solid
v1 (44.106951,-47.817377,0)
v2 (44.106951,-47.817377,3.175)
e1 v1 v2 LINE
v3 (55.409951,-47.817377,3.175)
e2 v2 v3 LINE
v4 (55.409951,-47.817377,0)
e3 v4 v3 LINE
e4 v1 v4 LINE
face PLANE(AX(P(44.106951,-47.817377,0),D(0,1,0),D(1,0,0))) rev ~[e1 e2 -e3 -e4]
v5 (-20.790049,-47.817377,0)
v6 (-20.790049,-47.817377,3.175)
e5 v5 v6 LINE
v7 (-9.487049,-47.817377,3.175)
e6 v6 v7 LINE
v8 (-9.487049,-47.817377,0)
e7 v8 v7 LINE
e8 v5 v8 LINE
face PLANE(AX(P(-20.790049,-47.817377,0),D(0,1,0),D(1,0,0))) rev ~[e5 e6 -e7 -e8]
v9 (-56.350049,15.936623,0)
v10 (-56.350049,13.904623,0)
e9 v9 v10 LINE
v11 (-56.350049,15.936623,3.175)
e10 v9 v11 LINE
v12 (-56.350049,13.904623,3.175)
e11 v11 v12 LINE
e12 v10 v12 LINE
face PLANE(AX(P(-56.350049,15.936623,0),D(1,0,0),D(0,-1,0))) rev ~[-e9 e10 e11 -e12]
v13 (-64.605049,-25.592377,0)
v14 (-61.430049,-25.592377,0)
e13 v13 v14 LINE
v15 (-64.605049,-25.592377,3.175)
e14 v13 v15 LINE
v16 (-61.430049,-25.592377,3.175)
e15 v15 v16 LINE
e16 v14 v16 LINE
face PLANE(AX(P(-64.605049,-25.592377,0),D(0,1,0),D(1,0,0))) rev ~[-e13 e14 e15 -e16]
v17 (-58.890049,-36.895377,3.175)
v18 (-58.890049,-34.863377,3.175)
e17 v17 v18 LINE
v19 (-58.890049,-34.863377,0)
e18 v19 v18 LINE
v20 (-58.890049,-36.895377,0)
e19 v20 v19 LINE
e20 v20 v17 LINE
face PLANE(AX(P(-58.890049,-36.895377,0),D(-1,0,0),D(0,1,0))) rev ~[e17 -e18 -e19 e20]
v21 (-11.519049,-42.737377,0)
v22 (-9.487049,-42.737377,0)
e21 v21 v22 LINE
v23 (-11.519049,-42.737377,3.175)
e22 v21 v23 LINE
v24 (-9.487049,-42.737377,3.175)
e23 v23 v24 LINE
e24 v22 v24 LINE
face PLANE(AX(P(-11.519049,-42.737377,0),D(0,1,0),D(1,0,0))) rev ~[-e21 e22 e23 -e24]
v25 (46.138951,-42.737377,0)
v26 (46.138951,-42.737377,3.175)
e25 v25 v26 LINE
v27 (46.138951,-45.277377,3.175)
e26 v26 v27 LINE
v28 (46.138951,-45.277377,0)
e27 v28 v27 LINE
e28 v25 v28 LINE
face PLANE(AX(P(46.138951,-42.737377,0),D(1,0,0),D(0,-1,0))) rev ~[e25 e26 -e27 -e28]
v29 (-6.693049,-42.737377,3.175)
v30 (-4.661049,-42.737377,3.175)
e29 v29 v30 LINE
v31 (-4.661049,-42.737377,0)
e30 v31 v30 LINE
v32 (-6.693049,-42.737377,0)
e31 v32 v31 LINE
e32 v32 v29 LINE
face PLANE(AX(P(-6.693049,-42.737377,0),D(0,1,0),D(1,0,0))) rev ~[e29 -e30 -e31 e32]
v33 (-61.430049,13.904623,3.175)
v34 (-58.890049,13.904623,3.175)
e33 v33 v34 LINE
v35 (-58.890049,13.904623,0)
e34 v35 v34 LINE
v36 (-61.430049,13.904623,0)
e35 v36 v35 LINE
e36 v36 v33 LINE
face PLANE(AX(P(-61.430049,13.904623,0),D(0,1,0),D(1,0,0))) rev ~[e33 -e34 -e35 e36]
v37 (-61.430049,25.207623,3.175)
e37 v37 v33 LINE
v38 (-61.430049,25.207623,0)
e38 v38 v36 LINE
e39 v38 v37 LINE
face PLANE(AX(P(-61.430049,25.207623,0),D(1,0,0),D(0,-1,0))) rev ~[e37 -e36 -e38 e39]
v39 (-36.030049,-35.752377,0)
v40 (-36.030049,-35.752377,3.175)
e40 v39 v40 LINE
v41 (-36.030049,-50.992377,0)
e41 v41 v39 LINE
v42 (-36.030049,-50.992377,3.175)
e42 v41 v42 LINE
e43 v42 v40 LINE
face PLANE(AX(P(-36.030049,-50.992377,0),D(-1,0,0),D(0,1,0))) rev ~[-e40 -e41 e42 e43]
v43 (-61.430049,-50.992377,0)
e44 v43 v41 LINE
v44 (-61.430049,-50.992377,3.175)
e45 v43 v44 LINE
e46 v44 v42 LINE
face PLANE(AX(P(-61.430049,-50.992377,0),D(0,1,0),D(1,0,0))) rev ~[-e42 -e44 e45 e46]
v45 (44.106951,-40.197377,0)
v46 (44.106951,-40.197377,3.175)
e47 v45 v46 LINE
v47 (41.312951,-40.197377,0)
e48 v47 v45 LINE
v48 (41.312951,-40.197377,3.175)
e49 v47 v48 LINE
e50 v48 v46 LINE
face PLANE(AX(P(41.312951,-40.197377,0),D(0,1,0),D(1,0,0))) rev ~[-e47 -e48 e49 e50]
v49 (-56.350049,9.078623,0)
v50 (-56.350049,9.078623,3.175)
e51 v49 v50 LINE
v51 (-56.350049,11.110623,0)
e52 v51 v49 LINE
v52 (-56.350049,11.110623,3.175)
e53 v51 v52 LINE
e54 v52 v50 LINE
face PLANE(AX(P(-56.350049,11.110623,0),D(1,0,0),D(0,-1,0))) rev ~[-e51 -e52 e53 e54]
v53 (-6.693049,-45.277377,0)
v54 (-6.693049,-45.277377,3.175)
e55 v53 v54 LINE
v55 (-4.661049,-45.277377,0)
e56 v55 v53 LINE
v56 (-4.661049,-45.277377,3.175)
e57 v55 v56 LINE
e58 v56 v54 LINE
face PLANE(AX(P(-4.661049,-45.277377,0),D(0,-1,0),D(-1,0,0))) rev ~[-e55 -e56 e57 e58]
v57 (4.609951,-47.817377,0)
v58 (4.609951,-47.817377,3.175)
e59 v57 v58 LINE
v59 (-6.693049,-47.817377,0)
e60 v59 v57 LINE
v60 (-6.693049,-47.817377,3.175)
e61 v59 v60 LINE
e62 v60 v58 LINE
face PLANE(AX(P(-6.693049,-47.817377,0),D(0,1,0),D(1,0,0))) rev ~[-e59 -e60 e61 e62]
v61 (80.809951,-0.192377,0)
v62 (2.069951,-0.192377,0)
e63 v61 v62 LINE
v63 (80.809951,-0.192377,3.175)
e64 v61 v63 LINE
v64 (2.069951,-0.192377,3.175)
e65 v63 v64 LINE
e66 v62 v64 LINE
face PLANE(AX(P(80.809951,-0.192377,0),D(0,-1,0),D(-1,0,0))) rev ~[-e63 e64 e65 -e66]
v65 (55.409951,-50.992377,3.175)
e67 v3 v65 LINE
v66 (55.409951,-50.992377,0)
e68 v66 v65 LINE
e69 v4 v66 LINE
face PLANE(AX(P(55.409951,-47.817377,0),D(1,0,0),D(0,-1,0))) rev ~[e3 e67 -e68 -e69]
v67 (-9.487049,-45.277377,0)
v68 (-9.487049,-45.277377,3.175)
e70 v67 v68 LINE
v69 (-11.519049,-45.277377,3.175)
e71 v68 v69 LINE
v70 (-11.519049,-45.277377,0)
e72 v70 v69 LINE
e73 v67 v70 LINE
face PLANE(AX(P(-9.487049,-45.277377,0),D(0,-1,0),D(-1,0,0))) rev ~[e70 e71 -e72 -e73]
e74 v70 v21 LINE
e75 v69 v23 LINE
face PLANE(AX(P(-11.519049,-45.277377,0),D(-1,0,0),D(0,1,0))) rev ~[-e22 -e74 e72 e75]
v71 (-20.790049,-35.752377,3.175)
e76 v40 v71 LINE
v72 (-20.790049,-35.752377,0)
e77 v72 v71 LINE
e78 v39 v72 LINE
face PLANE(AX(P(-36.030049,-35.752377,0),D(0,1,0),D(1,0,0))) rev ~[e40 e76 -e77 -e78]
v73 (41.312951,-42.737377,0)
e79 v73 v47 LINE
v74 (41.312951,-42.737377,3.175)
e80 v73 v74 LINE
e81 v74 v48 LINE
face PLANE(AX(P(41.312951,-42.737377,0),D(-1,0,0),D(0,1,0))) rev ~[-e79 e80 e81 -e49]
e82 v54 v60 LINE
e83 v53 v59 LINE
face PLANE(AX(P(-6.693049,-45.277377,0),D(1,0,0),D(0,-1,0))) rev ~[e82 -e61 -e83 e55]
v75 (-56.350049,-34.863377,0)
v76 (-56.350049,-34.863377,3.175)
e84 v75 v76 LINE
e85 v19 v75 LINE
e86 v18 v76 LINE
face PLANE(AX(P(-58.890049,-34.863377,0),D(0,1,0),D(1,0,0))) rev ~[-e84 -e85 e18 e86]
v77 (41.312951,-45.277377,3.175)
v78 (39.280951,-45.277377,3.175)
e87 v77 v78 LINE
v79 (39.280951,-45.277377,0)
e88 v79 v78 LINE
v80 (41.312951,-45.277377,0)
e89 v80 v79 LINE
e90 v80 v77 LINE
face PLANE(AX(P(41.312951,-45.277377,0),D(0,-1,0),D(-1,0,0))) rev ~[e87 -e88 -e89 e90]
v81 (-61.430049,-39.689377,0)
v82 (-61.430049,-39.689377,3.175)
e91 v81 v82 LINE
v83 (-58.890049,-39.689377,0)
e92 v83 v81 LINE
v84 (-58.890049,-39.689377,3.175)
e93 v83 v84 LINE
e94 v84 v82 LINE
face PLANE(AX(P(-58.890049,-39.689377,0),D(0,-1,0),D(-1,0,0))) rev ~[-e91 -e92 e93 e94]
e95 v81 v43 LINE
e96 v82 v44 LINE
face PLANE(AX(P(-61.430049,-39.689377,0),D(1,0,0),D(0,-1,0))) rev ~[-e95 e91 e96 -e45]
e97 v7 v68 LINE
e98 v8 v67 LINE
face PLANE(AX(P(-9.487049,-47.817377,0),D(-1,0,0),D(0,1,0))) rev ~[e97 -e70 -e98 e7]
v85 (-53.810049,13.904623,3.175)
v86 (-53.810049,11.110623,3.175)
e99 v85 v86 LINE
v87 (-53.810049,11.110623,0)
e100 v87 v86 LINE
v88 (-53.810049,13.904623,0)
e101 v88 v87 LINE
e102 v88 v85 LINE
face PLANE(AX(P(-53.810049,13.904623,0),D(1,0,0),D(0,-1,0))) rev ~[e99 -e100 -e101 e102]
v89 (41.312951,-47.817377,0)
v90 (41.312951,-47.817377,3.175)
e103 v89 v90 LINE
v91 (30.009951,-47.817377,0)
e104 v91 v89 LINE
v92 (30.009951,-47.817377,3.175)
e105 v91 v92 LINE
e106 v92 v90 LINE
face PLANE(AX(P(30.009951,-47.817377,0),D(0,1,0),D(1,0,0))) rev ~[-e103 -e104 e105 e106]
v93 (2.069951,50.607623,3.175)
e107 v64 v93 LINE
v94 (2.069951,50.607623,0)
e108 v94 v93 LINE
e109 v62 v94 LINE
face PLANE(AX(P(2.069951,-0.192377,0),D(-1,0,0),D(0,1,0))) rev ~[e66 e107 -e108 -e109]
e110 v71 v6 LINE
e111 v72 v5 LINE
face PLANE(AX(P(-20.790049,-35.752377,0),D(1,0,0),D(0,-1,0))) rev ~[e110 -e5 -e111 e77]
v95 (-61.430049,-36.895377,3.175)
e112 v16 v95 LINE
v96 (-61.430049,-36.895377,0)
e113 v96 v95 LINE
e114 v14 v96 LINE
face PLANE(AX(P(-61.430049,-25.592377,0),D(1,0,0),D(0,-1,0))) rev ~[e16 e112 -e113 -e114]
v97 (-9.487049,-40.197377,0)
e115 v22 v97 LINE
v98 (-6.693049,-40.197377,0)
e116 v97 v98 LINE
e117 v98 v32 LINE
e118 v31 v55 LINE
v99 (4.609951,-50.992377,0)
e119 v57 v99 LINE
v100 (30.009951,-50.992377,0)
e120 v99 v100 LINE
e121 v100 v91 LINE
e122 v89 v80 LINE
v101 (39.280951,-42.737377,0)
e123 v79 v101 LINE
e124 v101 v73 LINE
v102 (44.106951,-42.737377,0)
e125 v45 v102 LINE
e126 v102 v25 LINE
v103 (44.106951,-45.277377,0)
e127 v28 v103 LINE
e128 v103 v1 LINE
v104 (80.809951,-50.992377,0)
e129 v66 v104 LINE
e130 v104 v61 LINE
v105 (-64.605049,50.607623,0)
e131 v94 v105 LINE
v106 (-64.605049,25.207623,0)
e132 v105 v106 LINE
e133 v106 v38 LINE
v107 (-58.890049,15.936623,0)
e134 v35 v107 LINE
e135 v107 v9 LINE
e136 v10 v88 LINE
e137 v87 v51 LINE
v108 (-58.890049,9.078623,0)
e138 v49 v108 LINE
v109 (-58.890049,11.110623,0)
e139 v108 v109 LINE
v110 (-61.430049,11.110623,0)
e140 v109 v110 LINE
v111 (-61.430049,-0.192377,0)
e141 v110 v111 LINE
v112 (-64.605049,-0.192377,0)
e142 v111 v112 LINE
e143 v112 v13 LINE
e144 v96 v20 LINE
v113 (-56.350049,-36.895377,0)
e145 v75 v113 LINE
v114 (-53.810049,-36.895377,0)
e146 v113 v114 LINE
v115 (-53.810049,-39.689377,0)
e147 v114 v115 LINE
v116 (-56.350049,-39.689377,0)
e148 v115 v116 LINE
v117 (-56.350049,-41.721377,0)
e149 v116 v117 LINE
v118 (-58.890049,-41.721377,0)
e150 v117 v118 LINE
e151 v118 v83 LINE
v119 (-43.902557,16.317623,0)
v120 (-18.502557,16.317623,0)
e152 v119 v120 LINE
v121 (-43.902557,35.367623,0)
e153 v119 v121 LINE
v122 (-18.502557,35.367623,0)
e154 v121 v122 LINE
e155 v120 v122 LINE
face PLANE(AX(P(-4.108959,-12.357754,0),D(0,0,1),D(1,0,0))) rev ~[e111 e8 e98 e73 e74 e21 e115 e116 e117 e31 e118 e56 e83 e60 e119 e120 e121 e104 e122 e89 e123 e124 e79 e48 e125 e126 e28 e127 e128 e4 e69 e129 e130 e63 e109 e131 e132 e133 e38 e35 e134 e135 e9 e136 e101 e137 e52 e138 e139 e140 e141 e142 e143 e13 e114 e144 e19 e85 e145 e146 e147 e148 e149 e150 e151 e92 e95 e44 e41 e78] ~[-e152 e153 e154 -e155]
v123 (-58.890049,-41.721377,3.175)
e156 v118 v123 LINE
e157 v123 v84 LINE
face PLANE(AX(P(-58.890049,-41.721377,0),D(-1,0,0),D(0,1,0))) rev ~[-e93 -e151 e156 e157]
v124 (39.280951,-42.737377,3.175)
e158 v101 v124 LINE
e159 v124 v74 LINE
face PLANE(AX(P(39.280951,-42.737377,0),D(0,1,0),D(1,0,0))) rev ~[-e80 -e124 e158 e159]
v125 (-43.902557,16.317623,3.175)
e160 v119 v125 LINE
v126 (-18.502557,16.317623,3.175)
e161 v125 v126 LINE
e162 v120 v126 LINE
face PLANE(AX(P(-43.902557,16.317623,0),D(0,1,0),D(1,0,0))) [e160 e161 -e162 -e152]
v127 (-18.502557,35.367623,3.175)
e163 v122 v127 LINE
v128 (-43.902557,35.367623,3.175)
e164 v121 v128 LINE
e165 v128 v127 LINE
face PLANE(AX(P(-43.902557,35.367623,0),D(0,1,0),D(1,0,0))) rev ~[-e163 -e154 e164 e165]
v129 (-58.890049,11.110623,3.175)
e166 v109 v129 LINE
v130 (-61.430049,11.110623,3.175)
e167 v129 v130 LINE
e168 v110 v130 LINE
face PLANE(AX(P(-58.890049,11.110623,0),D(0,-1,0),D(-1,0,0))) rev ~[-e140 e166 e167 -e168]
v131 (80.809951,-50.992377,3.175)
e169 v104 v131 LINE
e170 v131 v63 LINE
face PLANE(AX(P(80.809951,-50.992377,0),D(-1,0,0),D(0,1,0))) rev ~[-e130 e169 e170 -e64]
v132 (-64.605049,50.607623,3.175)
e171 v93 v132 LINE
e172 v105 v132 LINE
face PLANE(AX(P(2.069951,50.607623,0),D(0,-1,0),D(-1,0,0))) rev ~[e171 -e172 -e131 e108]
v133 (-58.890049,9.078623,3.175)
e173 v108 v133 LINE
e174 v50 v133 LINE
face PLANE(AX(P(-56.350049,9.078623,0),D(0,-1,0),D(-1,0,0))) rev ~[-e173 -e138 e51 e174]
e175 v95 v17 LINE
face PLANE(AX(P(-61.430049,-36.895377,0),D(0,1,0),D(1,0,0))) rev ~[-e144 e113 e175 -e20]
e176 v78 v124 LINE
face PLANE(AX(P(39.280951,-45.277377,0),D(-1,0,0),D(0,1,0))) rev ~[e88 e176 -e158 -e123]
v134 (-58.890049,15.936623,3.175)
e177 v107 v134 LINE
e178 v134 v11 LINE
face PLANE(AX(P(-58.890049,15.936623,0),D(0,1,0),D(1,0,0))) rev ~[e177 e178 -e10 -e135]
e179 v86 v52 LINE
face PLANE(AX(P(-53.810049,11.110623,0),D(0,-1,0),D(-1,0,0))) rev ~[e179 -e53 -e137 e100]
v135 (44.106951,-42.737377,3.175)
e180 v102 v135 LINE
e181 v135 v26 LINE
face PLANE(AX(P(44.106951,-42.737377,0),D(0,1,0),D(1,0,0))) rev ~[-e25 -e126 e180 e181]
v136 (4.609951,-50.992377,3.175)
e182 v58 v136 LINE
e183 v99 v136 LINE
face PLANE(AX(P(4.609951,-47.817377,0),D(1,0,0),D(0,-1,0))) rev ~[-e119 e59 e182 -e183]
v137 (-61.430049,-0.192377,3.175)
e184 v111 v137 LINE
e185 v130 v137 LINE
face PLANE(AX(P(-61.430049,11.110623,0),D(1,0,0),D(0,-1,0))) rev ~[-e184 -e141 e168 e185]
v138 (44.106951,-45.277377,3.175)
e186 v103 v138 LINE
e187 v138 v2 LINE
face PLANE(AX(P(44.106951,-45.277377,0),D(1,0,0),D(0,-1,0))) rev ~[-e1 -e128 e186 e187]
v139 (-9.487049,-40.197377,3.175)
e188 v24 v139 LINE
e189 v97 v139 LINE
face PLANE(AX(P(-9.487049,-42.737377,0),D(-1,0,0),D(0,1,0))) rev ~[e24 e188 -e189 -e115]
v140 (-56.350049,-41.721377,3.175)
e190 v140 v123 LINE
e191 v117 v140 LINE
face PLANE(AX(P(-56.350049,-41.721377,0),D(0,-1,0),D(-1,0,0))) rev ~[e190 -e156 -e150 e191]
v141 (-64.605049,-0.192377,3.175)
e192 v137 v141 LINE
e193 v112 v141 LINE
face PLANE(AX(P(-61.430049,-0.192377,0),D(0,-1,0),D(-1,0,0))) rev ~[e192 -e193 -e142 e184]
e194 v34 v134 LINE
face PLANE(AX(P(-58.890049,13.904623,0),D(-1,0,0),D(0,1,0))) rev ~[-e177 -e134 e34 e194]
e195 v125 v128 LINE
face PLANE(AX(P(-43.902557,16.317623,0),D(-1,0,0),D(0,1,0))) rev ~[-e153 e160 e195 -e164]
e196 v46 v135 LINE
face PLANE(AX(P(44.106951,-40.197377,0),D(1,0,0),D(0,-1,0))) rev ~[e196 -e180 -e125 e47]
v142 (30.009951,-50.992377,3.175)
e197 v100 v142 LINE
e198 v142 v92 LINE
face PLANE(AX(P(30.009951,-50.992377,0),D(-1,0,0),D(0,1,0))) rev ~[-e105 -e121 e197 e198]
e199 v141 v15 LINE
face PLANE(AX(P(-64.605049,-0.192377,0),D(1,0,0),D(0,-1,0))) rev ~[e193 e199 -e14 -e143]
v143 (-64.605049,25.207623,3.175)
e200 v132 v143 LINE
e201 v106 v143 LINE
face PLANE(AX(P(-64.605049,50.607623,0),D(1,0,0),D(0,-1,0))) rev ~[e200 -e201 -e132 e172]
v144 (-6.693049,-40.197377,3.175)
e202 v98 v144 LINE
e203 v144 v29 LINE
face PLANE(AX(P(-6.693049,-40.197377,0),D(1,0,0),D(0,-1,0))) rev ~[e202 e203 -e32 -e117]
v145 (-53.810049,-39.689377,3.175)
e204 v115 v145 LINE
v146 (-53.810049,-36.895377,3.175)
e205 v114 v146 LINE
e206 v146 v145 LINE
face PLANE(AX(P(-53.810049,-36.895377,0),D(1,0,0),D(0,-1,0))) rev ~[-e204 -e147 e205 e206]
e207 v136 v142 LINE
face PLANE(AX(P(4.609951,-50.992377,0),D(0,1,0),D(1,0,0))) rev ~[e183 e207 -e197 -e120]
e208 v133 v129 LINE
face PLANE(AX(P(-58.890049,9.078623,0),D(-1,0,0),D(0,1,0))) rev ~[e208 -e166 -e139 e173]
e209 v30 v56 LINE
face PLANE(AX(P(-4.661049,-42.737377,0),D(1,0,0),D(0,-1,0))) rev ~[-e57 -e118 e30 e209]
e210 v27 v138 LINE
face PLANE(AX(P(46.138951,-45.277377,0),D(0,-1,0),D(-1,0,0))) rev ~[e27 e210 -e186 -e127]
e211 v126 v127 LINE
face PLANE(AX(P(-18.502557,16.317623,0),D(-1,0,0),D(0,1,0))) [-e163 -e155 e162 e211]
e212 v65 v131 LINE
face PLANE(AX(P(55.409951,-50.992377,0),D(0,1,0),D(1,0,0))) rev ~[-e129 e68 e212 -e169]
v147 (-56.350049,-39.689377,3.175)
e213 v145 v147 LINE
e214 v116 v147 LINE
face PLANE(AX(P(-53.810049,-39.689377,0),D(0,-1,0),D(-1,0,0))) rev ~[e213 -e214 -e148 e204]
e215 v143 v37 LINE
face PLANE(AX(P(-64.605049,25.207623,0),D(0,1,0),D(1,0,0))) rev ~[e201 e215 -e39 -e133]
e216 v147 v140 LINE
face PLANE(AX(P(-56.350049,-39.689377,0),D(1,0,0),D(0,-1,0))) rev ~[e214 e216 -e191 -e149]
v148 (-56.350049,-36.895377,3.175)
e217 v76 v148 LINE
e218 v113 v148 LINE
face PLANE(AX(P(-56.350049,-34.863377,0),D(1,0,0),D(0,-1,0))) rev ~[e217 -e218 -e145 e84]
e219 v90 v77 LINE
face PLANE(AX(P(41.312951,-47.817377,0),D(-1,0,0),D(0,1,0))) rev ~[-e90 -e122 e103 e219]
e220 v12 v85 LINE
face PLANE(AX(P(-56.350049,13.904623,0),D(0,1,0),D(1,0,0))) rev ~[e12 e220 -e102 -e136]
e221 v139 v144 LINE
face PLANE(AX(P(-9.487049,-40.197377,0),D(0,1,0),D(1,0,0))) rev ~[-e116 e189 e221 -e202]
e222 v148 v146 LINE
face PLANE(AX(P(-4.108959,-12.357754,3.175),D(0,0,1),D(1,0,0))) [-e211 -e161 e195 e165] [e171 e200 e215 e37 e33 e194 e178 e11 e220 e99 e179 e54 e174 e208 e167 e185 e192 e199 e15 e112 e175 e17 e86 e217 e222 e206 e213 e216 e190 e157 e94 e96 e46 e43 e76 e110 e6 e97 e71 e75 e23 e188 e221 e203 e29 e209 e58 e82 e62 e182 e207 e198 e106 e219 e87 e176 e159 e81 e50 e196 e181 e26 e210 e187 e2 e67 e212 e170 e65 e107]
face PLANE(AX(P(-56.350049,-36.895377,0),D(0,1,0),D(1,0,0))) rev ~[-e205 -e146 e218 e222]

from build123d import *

# Parameters (mm, degrees)
F0_W     = 25.4
F0_H     = 19.05
F1_DEPTH = 3.175


# Not quite as in the source:
# - a feature names something its author has since deleted; it is built from what else it names


with BuildPart() as f1:
    # F0 (on Top) → F1 (new body)
    with BuildSketch(Plane.XY):
        Polygon((2.0699514867, -0.1923768919), (2.0699514867, 50.6076231081), (-61.4300485133, 50.6076231081), (-64.6050485133, 50.6076231081), (-64.6050485133, 25.2076231081), (-61.4300485133, 25.2076231081), (-61.4300485133, 13.9046231081), (-58.8900485133, 13.9046231081), (-58.8900485133, 15.9366231081), (-56.3500485133, 15.9366231081), (-56.3500485133, 13.9046231081), (-53.8100485133, 13.9046231081), (-53.8100485133, 11.1106231081), (-56.3500485133, 11.1106231081), (-56.3500485133, 9.0786231081), (-58.8900485133, 9.0786231081), (-58.8900485133, 11.1106231081), (-61.4300485133, 11.1106231081), (-61.4300485133, -0.1923768919), (-64.6050485133, -0.1923768919), (-64.6050485133, -25.5923768919), (-61.4300485133, -25.5923768919), (-61.4300485133, -36.8953768919), (-58.8900485133, -36.8953768919), (-58.8900485133, -34.8633768919), (-56.3500485133, -34.8633768919), (-56.3500485133, -36.8953768919), (-53.8100485133, -36.8953768919), (-53.8100485133, -39.6893768919), (-56.3500485133, -39.6893768919), (-56.3500485133, -41.7213768919), (-58.8900485133, -41.7213768919), (-58.8900485133, -39.6893768919), (-61.4300485133, -39.6893768919), (-61.4300485133, -50.9923768919), (-36.0300485133, -50.9923768919), (-36.0300485133, -35.7523768919), (-20.7900485133, -35.7523768919), (-20.7900485133, -47.8173768919), (-9.4870485133, -47.8173768919), (-9.4870485133, -45.2773768919), (-11.5190485133, -45.2773768919), (-11.5190485133, -42.7373768919), (-9.4870485133, -42.7373768919), (-9.4870485133, -40.1973768919), (-6.6930485133, -40.1973768919), (-6.6930485133, -42.7373768919), (-4.6610485133, -42.7373768919), (-4.6610485133, -45.2773768919), (-6.6930485133, -45.2773768919), (-6.6930485133, -47.8173768919), (4.6099514867, -47.8173768919), (4.6099514867, -50.9923768919), (30.0099514867, -50.9923768919), (30.0099514867, -47.8173768919), (41.3129514867, -47.8173768919), (41.3129514867, -45.2773768919), (39.2809514867, -45.2773768919), (39.2809514867, -42.7373768919), (41.3129514867, -42.7373768919), (41.3129514867, -40.1973768919), (44.1069514867, -40.1973768919), (44.1069514867, -42.7373768919), (46.1389514867, -42.7373768919), (46.1389514867, -45.2773768919), (44.1069514867, -45.2773768919), (44.1069514867, -47.8173768919), (55.4099514867, -47.8173768919), (55.4099514867, -50.9923768919), (80.8099514867, -50.9923768919), (80.8099514867, -0.1923768919), align=None)
        with Locations((-31.2025573432, 25.8426231081)):
            Rectangle(F0_W, F0_H, mode=Mode.SUBTRACT)
    extrude(amount=F1_DEPTH)


solid = f1.part
